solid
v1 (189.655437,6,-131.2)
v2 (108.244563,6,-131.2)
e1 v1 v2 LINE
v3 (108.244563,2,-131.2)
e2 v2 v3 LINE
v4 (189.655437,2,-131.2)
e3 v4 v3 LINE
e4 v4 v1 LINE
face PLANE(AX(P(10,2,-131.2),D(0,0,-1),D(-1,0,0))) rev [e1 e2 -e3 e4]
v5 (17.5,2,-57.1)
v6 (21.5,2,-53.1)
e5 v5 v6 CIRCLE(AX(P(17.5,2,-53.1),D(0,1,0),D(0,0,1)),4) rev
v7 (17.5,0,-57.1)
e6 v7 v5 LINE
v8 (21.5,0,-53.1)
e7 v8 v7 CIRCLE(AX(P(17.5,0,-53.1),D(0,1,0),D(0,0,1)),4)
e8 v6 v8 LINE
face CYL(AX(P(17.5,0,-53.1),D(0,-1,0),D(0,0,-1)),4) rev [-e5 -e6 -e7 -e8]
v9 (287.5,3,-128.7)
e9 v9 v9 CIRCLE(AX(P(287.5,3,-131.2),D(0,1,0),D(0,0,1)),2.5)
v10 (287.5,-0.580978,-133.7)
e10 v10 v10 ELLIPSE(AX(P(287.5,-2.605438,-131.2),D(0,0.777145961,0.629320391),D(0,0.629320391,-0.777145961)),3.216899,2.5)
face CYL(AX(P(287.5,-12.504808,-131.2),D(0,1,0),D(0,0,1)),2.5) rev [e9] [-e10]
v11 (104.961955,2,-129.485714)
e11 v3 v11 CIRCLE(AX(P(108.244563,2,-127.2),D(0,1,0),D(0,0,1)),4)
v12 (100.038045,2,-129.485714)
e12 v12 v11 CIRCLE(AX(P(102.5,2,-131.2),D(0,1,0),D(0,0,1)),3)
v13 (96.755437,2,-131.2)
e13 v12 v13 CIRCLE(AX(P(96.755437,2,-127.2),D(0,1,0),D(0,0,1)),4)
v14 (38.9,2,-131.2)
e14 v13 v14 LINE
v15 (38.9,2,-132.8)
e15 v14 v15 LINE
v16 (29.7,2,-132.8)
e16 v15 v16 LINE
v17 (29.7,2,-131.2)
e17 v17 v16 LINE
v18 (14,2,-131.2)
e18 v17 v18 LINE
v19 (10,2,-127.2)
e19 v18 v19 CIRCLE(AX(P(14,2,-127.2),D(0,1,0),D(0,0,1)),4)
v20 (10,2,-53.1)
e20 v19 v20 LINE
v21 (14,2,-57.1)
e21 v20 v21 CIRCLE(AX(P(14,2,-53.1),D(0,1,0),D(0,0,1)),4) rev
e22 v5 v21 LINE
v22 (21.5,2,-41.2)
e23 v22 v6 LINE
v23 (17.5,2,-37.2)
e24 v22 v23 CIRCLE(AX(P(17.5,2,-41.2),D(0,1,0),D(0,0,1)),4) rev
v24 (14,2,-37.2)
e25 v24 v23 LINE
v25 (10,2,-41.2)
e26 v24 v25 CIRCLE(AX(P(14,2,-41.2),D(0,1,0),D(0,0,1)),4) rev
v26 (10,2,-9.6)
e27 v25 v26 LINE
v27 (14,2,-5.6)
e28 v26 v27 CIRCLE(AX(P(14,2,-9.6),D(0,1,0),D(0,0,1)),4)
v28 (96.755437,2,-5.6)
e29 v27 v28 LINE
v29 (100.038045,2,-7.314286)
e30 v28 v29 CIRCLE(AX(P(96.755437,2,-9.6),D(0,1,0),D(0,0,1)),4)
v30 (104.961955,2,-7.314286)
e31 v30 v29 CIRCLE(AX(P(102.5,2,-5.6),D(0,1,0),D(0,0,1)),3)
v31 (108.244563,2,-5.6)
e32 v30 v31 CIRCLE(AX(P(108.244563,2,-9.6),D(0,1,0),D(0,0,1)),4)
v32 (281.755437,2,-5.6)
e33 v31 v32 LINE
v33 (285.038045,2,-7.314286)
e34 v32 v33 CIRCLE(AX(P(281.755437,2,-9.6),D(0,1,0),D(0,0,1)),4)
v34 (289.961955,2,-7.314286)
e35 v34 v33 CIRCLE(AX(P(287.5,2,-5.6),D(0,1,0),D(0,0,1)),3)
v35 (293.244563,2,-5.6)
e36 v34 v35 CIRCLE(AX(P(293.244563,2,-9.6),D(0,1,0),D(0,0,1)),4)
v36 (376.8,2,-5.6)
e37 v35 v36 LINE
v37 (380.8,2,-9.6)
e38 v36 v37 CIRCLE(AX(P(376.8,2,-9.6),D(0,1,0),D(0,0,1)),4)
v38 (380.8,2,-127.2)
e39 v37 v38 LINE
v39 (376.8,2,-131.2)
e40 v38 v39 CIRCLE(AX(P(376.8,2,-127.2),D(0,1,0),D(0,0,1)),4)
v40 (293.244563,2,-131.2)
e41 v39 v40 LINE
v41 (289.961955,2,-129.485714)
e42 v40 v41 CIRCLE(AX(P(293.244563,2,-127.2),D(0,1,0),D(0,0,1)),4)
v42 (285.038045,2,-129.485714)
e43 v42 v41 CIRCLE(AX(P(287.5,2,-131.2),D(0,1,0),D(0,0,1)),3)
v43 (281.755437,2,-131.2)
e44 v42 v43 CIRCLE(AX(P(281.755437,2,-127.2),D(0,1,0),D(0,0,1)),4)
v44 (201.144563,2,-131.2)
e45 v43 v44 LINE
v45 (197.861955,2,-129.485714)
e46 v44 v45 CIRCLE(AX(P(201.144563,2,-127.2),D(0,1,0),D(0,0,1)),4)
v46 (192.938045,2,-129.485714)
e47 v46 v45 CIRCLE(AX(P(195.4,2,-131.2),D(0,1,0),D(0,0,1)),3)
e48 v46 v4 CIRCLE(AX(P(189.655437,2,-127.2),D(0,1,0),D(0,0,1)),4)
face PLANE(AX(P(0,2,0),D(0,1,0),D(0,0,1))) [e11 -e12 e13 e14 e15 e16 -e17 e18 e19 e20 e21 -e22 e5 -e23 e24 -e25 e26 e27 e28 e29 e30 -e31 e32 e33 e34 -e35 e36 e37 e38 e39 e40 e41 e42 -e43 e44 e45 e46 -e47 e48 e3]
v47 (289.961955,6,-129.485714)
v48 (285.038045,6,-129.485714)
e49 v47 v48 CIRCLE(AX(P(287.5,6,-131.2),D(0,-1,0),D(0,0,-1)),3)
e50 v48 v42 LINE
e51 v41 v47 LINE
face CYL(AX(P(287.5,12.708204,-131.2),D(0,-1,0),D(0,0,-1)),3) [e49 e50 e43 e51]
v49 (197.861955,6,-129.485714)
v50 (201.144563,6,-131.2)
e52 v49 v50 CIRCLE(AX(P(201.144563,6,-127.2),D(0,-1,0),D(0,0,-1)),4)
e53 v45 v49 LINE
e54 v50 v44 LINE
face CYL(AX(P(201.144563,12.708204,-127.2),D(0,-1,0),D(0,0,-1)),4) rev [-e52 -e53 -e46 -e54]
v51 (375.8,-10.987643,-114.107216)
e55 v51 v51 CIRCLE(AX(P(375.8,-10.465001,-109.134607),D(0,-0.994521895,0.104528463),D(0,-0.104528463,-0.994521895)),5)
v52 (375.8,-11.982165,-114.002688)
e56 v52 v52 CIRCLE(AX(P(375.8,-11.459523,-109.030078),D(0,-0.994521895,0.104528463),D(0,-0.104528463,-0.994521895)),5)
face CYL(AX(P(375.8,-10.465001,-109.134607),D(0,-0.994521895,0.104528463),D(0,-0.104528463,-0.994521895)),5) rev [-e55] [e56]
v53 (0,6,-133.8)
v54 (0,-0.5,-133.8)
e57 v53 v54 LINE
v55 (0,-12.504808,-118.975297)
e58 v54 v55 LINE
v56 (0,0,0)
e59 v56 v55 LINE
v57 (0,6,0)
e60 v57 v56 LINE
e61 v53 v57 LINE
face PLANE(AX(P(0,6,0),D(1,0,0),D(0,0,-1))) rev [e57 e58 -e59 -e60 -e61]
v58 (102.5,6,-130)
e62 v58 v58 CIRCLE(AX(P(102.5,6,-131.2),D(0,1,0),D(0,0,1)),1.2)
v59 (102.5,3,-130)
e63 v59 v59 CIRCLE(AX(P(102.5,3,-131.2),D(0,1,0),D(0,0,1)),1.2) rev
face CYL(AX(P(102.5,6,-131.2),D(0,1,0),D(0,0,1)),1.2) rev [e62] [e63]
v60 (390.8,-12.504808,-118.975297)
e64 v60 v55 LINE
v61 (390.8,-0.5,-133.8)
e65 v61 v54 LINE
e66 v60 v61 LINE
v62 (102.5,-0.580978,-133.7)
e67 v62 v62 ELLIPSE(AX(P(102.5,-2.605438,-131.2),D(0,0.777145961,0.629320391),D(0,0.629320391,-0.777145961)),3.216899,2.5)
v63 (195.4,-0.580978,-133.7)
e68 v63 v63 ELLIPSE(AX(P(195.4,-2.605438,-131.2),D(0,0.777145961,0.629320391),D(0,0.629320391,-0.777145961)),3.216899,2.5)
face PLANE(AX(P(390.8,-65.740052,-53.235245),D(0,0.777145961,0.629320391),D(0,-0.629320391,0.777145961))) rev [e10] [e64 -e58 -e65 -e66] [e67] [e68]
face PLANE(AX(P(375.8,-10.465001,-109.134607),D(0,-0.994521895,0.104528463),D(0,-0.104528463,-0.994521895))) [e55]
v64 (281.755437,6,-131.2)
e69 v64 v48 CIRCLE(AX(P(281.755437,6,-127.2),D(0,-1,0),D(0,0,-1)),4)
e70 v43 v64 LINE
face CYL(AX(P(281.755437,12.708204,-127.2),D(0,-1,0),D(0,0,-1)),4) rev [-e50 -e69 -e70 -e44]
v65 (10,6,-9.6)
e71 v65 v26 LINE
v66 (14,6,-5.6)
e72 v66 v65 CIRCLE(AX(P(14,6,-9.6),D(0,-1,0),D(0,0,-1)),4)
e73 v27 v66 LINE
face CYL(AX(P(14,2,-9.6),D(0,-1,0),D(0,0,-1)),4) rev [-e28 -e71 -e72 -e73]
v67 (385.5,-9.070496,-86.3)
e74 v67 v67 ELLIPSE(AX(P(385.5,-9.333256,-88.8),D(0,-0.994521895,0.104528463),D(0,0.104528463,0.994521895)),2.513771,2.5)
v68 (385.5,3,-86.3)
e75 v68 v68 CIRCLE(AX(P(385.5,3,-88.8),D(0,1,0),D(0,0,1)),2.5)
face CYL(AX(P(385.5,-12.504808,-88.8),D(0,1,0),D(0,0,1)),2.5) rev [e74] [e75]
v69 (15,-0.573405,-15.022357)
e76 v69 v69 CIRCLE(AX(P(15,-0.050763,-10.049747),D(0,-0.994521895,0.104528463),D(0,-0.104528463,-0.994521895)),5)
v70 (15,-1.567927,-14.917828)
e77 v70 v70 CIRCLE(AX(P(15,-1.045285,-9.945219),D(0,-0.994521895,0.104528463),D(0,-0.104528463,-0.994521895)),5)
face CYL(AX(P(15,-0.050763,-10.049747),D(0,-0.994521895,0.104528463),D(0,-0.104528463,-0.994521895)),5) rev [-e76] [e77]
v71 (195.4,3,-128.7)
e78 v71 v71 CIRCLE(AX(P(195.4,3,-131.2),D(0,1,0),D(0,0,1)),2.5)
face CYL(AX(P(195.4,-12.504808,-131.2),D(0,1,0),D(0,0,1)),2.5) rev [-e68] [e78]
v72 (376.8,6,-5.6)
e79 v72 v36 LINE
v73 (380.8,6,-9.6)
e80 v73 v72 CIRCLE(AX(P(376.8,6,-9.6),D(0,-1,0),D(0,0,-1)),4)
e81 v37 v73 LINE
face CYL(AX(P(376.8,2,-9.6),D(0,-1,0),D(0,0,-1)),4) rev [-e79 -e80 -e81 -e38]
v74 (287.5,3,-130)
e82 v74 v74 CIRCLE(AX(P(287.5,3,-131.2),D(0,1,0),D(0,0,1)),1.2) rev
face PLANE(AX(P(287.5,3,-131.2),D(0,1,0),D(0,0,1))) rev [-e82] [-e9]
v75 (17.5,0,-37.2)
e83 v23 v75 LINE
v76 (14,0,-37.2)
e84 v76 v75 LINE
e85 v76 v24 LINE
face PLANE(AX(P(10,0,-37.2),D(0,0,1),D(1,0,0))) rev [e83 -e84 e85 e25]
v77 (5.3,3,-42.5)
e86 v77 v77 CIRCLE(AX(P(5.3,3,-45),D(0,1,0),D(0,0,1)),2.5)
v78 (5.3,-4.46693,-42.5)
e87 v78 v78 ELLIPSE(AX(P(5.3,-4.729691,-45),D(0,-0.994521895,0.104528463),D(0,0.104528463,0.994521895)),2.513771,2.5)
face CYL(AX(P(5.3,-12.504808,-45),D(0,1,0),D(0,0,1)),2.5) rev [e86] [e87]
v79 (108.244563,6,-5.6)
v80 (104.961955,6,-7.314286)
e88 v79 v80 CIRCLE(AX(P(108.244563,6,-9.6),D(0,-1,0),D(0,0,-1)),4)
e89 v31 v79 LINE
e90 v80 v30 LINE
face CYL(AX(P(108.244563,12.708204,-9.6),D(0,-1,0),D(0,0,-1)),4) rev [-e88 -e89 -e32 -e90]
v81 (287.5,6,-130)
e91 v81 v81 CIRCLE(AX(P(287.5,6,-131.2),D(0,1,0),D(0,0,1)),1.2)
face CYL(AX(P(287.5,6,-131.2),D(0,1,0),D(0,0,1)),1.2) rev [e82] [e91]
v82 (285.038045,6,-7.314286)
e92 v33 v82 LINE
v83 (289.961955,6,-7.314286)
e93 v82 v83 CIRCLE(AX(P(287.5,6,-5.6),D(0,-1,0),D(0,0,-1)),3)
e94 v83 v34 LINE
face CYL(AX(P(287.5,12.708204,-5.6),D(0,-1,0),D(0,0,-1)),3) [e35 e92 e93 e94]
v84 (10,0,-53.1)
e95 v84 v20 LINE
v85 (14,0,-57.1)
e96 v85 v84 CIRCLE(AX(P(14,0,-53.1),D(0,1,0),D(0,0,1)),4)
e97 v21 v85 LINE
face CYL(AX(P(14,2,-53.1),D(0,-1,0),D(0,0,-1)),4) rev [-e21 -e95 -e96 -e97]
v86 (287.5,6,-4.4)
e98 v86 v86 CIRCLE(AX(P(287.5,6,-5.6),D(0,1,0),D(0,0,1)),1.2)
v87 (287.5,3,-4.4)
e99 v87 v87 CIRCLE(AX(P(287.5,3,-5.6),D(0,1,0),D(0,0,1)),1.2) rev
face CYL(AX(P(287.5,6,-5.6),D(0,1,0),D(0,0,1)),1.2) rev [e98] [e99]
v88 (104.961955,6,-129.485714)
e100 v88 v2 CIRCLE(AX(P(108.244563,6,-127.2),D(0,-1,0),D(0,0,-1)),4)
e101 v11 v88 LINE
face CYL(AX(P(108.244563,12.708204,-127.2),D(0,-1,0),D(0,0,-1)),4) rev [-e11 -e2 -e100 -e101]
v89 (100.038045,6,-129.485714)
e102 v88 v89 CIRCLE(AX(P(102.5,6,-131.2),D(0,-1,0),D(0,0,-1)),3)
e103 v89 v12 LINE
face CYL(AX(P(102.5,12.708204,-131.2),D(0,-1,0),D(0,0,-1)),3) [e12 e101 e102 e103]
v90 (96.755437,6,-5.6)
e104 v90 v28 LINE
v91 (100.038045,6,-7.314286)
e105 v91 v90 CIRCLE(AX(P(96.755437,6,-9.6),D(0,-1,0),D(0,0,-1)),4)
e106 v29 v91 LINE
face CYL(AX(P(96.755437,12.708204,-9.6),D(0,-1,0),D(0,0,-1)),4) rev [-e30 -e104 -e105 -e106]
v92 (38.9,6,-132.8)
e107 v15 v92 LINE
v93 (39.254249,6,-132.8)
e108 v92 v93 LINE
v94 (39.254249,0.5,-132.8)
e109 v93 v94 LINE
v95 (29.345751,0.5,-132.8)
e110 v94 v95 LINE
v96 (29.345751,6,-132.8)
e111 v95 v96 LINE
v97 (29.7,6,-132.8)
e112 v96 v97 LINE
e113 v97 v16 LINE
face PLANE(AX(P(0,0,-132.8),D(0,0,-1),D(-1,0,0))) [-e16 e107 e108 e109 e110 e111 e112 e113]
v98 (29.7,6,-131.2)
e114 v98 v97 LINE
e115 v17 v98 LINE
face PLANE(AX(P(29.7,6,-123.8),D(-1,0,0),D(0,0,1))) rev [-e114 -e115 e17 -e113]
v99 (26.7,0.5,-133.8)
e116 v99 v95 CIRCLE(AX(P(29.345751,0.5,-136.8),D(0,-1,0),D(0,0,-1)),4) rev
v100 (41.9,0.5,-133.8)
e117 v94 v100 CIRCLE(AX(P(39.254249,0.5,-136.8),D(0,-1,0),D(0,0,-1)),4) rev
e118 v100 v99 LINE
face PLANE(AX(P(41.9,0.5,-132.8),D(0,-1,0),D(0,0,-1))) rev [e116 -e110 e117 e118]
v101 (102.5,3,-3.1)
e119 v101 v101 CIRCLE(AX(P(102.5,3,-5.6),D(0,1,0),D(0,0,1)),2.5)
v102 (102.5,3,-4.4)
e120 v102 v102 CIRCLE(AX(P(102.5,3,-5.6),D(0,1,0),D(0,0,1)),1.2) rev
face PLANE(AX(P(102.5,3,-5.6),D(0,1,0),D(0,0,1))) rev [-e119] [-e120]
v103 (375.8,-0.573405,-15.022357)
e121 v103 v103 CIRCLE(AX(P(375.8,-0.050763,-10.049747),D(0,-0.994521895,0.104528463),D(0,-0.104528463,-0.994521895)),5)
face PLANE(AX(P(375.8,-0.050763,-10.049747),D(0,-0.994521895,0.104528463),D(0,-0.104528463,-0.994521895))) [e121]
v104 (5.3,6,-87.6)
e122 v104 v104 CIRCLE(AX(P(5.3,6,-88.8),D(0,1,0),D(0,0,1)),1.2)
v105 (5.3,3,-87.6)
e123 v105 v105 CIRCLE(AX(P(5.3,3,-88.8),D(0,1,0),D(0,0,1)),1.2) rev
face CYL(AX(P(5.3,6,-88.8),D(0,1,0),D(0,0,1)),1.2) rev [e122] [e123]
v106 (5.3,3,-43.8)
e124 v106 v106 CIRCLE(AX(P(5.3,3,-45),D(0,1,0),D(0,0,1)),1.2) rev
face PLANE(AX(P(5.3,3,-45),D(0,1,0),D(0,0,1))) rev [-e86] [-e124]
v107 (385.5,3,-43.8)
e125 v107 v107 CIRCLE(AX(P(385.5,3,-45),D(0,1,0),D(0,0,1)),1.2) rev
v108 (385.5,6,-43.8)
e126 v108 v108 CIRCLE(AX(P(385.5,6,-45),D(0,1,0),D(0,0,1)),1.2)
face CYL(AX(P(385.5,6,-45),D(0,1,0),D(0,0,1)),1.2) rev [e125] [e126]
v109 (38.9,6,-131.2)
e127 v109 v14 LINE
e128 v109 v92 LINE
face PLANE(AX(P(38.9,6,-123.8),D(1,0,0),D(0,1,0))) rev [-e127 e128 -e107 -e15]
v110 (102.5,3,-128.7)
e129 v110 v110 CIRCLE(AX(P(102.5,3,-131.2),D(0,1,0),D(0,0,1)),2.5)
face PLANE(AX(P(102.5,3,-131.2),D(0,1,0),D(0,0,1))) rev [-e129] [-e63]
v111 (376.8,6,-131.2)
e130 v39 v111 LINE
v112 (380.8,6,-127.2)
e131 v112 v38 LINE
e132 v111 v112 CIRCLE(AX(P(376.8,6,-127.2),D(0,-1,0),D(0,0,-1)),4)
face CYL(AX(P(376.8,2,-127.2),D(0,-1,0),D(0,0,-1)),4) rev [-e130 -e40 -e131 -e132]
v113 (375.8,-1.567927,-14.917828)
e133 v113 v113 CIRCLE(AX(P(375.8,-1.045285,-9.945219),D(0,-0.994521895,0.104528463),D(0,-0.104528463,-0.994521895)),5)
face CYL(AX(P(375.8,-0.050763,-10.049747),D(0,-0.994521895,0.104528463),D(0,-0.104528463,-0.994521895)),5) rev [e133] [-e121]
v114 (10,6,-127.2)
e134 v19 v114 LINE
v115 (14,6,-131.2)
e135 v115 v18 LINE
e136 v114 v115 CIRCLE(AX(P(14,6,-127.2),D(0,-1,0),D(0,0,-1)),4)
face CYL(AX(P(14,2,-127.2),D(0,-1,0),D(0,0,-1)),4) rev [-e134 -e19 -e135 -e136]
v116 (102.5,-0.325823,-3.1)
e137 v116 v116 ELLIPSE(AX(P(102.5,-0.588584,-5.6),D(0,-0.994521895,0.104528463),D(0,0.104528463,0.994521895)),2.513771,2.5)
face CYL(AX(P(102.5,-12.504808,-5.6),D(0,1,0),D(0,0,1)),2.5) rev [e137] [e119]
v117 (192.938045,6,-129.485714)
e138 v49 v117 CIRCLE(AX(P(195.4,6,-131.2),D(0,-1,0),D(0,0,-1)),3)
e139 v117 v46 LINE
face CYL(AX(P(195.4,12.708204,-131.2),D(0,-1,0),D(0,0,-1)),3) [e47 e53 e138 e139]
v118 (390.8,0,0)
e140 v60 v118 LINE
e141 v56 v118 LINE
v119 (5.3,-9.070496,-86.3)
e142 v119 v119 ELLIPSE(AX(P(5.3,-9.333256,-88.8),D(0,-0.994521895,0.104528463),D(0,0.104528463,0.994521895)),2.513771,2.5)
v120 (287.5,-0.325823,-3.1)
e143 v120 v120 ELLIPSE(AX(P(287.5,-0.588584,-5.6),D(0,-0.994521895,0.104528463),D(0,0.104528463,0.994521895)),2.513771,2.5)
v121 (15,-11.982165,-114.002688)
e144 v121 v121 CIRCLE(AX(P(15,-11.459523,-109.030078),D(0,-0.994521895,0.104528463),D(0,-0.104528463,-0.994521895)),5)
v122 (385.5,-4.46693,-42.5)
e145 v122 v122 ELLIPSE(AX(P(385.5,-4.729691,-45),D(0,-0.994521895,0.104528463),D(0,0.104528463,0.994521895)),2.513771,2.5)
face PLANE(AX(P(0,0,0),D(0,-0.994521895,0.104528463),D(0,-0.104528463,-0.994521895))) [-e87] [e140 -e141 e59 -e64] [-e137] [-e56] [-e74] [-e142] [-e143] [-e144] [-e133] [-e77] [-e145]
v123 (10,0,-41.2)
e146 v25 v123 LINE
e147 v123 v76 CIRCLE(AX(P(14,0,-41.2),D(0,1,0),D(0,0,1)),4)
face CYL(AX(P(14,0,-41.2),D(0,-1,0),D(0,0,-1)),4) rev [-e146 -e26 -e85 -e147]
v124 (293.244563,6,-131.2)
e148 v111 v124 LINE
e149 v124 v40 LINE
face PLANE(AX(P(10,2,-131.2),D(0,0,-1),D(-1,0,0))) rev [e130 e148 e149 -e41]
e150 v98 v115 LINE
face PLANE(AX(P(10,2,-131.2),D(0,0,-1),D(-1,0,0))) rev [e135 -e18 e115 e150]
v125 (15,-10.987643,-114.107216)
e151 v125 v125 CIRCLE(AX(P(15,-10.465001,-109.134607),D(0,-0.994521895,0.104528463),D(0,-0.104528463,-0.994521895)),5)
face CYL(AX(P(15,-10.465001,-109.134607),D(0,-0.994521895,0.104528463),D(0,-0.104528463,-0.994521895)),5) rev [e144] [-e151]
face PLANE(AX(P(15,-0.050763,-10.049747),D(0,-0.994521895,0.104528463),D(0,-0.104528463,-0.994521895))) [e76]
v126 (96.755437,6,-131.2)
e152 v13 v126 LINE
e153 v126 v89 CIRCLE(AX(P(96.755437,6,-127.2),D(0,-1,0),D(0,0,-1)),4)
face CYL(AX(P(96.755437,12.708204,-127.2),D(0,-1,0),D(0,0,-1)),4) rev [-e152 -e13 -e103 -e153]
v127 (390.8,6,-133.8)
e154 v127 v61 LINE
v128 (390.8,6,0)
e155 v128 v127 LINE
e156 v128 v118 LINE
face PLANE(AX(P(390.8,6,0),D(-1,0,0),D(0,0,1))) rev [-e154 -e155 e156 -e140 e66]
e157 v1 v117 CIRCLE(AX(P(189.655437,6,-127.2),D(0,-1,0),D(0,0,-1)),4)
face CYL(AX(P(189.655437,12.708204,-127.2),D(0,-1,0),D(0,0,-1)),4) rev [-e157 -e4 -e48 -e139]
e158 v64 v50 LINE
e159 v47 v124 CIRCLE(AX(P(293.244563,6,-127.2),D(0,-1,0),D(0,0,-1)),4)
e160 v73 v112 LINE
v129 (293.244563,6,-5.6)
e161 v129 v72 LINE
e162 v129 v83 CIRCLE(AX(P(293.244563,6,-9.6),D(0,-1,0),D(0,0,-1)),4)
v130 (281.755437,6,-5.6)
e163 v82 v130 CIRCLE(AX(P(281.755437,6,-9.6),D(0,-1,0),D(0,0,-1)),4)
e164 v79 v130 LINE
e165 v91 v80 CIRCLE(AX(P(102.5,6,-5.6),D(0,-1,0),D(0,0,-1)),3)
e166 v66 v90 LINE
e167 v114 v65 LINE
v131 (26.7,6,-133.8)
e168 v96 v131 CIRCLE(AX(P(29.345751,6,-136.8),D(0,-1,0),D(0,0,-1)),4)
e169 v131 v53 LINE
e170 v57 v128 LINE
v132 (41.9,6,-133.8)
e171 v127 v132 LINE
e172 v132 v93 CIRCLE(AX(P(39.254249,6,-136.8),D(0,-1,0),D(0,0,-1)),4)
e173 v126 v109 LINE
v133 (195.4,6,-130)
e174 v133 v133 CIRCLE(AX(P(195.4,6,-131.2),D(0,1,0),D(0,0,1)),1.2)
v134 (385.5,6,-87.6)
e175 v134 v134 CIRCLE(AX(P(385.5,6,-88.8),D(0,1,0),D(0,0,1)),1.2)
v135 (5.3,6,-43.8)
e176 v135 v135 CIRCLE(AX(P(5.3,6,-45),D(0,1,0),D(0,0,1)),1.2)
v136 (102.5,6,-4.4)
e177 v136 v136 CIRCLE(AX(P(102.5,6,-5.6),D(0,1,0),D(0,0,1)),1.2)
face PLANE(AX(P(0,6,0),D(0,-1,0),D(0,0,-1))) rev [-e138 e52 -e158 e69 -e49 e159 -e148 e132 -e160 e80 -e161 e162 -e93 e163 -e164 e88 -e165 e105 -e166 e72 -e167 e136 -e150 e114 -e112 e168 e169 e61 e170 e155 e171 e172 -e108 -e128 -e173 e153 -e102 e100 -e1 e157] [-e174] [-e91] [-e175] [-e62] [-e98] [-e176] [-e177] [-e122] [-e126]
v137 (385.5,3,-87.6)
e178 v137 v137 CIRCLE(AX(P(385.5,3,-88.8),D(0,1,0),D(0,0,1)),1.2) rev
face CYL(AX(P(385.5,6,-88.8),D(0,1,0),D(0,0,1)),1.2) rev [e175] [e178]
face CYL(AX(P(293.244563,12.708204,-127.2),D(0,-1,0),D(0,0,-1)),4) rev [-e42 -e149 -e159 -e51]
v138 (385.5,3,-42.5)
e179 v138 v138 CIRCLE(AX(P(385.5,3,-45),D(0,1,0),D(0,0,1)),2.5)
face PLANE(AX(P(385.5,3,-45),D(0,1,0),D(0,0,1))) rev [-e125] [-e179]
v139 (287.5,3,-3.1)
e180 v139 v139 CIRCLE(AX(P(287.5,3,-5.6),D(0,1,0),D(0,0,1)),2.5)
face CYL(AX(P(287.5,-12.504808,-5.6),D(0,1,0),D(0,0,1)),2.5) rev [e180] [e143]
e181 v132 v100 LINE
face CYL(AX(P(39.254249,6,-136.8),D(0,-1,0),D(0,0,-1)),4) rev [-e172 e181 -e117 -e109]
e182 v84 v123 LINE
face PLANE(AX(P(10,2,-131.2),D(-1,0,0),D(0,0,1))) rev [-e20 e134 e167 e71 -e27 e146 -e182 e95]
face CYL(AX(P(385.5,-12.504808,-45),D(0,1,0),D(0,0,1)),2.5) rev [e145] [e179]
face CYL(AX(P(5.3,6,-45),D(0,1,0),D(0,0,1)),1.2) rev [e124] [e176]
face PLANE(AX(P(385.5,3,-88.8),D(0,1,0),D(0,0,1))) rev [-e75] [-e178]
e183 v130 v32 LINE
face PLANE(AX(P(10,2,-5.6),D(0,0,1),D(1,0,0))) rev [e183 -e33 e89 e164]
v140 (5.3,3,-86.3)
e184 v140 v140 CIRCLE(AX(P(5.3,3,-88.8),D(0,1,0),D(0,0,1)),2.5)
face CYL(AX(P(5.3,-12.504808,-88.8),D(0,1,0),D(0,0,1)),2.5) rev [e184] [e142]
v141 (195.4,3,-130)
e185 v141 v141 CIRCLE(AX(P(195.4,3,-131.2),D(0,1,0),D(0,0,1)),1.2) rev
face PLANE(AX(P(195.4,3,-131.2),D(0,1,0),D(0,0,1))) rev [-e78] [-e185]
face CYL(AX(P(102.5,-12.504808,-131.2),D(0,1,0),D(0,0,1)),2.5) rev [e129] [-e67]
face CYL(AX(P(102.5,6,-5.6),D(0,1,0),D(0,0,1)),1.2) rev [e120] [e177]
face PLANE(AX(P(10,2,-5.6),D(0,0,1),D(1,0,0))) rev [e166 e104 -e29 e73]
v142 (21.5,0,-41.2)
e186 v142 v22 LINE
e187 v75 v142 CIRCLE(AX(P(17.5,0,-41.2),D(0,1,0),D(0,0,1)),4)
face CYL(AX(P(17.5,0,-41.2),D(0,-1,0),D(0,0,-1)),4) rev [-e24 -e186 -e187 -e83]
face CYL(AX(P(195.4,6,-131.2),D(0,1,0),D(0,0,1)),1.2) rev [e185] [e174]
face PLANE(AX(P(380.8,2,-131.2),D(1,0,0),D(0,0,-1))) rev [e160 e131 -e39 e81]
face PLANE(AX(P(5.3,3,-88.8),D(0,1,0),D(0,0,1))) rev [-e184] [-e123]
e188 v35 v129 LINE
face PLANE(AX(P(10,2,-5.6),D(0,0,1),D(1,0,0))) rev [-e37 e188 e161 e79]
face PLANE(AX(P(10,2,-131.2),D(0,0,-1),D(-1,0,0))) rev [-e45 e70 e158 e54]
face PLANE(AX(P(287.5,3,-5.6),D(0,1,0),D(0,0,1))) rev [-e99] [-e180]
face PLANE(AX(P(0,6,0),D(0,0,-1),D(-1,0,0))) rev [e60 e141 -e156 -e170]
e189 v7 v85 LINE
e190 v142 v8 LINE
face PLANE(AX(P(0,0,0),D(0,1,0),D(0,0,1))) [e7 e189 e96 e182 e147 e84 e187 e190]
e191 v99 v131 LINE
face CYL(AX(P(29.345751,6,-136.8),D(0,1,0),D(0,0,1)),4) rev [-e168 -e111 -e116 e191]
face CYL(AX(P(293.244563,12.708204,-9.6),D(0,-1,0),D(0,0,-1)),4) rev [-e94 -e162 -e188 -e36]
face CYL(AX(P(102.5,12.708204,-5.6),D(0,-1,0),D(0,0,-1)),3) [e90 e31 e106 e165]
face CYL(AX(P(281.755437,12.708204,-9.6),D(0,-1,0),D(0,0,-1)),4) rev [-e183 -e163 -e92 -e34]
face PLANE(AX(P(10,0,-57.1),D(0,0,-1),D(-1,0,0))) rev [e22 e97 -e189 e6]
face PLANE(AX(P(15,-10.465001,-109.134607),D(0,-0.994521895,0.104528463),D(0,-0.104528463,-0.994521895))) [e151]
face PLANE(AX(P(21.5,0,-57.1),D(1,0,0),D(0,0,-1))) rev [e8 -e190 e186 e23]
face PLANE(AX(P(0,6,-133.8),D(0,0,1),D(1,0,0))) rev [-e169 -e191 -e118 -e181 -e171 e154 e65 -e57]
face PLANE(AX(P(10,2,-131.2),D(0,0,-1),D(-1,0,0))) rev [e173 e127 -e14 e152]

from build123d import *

# Parameters (mm, degrees)
SKETCH1_W               = 390.8
SKETCH1_H               = 133.8
BOSS_EXTRUDE1_DEPTH     = 6
SKETCH2_W               = 370.8
SKETCH2_H               = 125.6
CUT_EXTRUDE1_DEPTH      = 4
BOSS_EXTRUDE3_DEPTH     = 390.8
SKETCH8_W               = 9.2
SKETCH8_H               = 4
CUT_EXTRUDE2_DEPTH      = 10
BOSS_EXTRUDE4_DEPTH     = 4
SKETCH11_W              = 15.2
SKETCH11_H              = 5.5
CUT_EXTRUDE3_DEPTH      = 1
CUT_EXTRUDE6_DEPTH      = 414.309625425
CUT_EXTRUDE6_DEPTH_BACK = 414.309625425
M2_CLEARANCE_HOLE1_D    = 2.4
CUT_EXTRUDE7_START      = -3
SKETCH13_R              = 2.5
CUT_EXTRUDE7_DEPTH      = 411.484592101
FILLET2_R               = 4
SKETCH15_R              = 5
CUT_EXTRUDE8_DEPTH      = 1
SKETCH16_W              = 11.5
SKETCH16_H              = 19.9
CUT_EXTRUDE9_DEPTH      = 6
FILLET1_R               = 4


with BuildPart() as part:
    # Sketch1 → Boss-Extrude1 (new body)
    with BuildSketch(Plane(origin=(0, 0, 0), x_dir=(1, 0, 0), z_dir=(0, 1, 0))):
        with Locations((195.4, 66.9)):
            Rectangle(SKETCH1_W, SKETCH1_H)
    extrude(amount=BOSS_EXTRUDE1_DEPTH)

    # Sketch2 → Cut-Extrude1 (cut)
    with BuildSketch(Plane(origin=(0, 6, 0), x_dir=(1, 0, 0), z_dir=(0, 1, 0))):
        with Locations((195.4, 68.4)):
            Rectangle(SKETCH2_W, SKETCH2_H)
    extrude(amount=-CUT_EXTRUDE1_DEPTH, mode=Mode.SUBTRACT)

    # Boss-Extrude3: read off the stored shape, not the designer's step
    # Boss-Extrude3 outline → Boss-Extrude3 (add)
    with BuildSketch(Plane.YZ):
        Polygon((-14.062946679, -133.8), (0, -133.8), (0, 0), align=None)
    extrude(amount=BOSS_EXTRUDE3_DEPTH)

    # Sketch8 → Cut-Extrude2 (cut)
    with BuildSketch(Plane(origin=(0, 0, -133.8), x_dir=(-1, 0, 0), z_dir=(0, 0, -1))):
        with Locations((-34.3, 4)):
            Rectangle(SKETCH8_W, SKETCH8_H)
    extrude(amount=-CUT_EXTRUDE2_DEPTH, mode=Mode.SUBTRACT)

    # Sketch10 → Boss-Extrude4 (add)
    with BuildSketch(Plane(origin=(0, 2, 0), x_dir=(1, 0, 0), z_dir=(0, 1, 0))):
        with BuildLine():
            Line((99.5, 5.6), (105.5, 5.6))
            ThreePointArc((105.5, 5.6), (102.5, 8.6), (99.5, 5.6))
        make_face()
        with BuildLine():
            ThreePointArc((290.5, 5.6), (287.5, 8.6), (284.5, 5.6))
            Line((284.5, 5.6), (290.5, 5.6))
        make_face()
        with BuildLine():
            ThreePointArc((284.5, 131.2), (287.5, 128.2), (290.5, 131.2))
            Line((290.5, 131.2), (284.5, 131.2))
        make_face()
        with BuildLine():
            ThreePointArc((192.4, 131.2), (195.4, 128.2), (198.4, 131.2))
            Line((198.4, 131.2), (192.4, 131.2))
        make_face()
        with BuildLine():
            Line((105.5, 131.2), (99.5, 131.2))
            ThreePointArc((99.5, 131.2), (102.5, 128.2), (105.5, 131.2))
        make_face()
    extrude(amount=BOSS_EXTRUDE4_DEPTH)

    # Sketch11 → Cut-Extrude3 (cut)
    with BuildSketch(Plane(origin=(0, 0, -133.8), x_dir=(-1, 0, 0), z_dir=(0, 0, -1))):
        with Locations((-34.3, 3.25)):
            Rectangle(SKETCH11_W, SKETCH11_H)
    extrude(amount=-CUT_EXTRUDE3_DEPTH, mode=Mode.SUBTRACT)

    # Sketch12 → Cut-Extrude6 (cut, two sides: drawn at the far end of the back side and taken through both)
    with BuildSketch(Plane.ZY.offset(-CUT_EXTRUDE6_DEPTH_BACK)):
        Polygon((-133.8, -14.062946679), (-118.975297196, -12.504807627), (-133.8, -0.5), align=None)
    extrude(amount=CUT_EXTRUDE6_DEPTH + CUT_EXTRUDE6_DEPTH_BACK, mode=Mode.SUBTRACT)

    # M2 Clearance Hole1 (through all)
    with Locations(Plane(origin=(102.5, 6, -5.6), x_dir=(0, 0, 1), z_dir=(0, 1, 0))):
        with Locations((0, 0), (-39.4, -97.2), (-83.2, -97.2), (-125.6, 0), (-125.6, 92.9), (-125.6, 185), (-83.2, 283), (-39.4, 283), (0, 185)):
            Hole(M2_CLEARANCE_HOLE1_D / 2)

    # Sketch13 → Cut-Extrude7 (cut, through all)
    with BuildSketch(Plane(origin=(0, 6, 0), x_dir=(1, 0, 0), z_dir=(0, 1, 0)).offset(CUT_EXTRUDE7_START)):
        with Locations(Location((5.3, 45, 0), (0, 0, 270))):
            Circle(SKETCH13_R)
        with Locations(Location((5.3, 88.8, 0), (0, 0, 270))):
            Circle(SKETCH13_R)
        with Locations(Location((102.5, 5.6, 0), (0, 0, 270))):
            Circle(SKETCH13_R)
        with Locations(Location((287.5, 5.6, 0), (0, 0, 270))):
            Circle(SKETCH13_R)
        with Locations(Location((385.5, 45, 0), (0, 0, 270))):
            Circle(SKETCH13_R)
        with Locations(Location((385.5, 88.8, 0), (0, 0, 270))):
            Circle(SKETCH13_R)
        with Locations(Location((287.5, 131.2, 0), (0, 0, 270))):
            Circle(SKETCH13_R)
        with Locations(Location((195.4, 131.2, 0), (0, 0, 270))):
            Circle(SKETCH13_R)
        with Locations(Location((102.5, 131.2, 0), (0, 0, 270))):
            Circle(SKETCH13_R)
    extrude(amount=-CUT_EXTRUDE7_DEPTH, mode=Mode.SUBTRACT)

    # Fillet2
    # the kernel refuses this fillet: 4 mm, written as the material it adds along each edge
    with BuildSketch(Plane(origin=(41.9, 0.5, -132.8), x_dir=(-1, 0, 0), z_dir=(0, 1, 0))) as fillet2_piece_1:
        with BuildLine():
            CenterArc((2.645751311, -4), FILLET2_R, 90, 41.409622109)
            Line((0, -1), (0, 0))
            Line((0, 0), (2.645751311, 0))
        make_face()
    extrude(amount=5.5)
    with BuildSketch(Plane(origin=(26.7, 6, -132.8), x_dir=(0, 0, -1), z_dir=(0, -1, 0))) as fillet2_piece_2:
        with BuildLine():
            CenterArc((4, 2.645751311), FILLET2_R, 180, 41.409622109)
            Line((0, 2.645751311), (0, 0))
            Line((0, 0), (1, 0))
        make_face()
    extrude(amount=5.5)

    # Sketch15 → Cut-Extrude8 (cut)
    with BuildSketch(Plane(origin=(0, 0, 0), x_dir=(1, 0, 0), z_dir=(0, -0.9945218953682742, 0.10452846326764666))):
        with Locations(Location((15, -109.630646394, 0), (0, 0, 270))):
            Circle(SKETCH15_R)
        with Locations(Location((375.8, -109.630646394, 0), (0, 0, 270))):
            Circle(SKETCH15_R)
        with Locations(Location((15, -10, 0), (0, 0, 270))):
            Circle(SKETCH15_R)
        with Locations(Location((375.8, -10, 0), (0, 0, 270))):
            Circle(SKETCH15_R)
    extrude(amount=-CUT_EXTRUDE8_DEPTH, mode=Mode.SUBTRACT)

    # Sketch16 → Cut-Extrude9 (cut)
    with BuildSketch(Plane(origin=(0, 6, 0), x_dir=(1, 0, 0), z_dir=(0, 1, 0))):
        with Locations((15.75, 47.15)):
            Rectangle(SKETCH16_W, SKETCH16_H)
    extrude(amount=-CUT_EXTRUDE9_DEPTH, mode=Mode.SUBTRACT)

    # Fillet1
    fillet1_edges = [part.edges().sort_by_distance(p)[0] for p in [
        (10, 4, -5.6),
        (10, 4, -131.2),
        (380.8, 4, -131.2),
        (380.8, 4, -5.6),
        (10, 1, -37.2),
        (10, 1, -57.1),
        (21.5, 1, -57.1),
        (21.5, 1, -37.2),
        (99.5, 4, -131.2),
        (105.5, 4, -131.2),
        (192.4, 4, -131.2),
        (198.4, 4, -131.2),
        (284.5, 4, -131.2),
        (290.5, 4, -131.2),
        (290.5, 4, -5.6),
        (284.5, 4, -5.6),
        (105.5, 4, -5.6),
        (99.5, 4, -5.6),
    ]]
    fillet(fillet1_edges, radius=FILLET1_R)


solid = part.part
